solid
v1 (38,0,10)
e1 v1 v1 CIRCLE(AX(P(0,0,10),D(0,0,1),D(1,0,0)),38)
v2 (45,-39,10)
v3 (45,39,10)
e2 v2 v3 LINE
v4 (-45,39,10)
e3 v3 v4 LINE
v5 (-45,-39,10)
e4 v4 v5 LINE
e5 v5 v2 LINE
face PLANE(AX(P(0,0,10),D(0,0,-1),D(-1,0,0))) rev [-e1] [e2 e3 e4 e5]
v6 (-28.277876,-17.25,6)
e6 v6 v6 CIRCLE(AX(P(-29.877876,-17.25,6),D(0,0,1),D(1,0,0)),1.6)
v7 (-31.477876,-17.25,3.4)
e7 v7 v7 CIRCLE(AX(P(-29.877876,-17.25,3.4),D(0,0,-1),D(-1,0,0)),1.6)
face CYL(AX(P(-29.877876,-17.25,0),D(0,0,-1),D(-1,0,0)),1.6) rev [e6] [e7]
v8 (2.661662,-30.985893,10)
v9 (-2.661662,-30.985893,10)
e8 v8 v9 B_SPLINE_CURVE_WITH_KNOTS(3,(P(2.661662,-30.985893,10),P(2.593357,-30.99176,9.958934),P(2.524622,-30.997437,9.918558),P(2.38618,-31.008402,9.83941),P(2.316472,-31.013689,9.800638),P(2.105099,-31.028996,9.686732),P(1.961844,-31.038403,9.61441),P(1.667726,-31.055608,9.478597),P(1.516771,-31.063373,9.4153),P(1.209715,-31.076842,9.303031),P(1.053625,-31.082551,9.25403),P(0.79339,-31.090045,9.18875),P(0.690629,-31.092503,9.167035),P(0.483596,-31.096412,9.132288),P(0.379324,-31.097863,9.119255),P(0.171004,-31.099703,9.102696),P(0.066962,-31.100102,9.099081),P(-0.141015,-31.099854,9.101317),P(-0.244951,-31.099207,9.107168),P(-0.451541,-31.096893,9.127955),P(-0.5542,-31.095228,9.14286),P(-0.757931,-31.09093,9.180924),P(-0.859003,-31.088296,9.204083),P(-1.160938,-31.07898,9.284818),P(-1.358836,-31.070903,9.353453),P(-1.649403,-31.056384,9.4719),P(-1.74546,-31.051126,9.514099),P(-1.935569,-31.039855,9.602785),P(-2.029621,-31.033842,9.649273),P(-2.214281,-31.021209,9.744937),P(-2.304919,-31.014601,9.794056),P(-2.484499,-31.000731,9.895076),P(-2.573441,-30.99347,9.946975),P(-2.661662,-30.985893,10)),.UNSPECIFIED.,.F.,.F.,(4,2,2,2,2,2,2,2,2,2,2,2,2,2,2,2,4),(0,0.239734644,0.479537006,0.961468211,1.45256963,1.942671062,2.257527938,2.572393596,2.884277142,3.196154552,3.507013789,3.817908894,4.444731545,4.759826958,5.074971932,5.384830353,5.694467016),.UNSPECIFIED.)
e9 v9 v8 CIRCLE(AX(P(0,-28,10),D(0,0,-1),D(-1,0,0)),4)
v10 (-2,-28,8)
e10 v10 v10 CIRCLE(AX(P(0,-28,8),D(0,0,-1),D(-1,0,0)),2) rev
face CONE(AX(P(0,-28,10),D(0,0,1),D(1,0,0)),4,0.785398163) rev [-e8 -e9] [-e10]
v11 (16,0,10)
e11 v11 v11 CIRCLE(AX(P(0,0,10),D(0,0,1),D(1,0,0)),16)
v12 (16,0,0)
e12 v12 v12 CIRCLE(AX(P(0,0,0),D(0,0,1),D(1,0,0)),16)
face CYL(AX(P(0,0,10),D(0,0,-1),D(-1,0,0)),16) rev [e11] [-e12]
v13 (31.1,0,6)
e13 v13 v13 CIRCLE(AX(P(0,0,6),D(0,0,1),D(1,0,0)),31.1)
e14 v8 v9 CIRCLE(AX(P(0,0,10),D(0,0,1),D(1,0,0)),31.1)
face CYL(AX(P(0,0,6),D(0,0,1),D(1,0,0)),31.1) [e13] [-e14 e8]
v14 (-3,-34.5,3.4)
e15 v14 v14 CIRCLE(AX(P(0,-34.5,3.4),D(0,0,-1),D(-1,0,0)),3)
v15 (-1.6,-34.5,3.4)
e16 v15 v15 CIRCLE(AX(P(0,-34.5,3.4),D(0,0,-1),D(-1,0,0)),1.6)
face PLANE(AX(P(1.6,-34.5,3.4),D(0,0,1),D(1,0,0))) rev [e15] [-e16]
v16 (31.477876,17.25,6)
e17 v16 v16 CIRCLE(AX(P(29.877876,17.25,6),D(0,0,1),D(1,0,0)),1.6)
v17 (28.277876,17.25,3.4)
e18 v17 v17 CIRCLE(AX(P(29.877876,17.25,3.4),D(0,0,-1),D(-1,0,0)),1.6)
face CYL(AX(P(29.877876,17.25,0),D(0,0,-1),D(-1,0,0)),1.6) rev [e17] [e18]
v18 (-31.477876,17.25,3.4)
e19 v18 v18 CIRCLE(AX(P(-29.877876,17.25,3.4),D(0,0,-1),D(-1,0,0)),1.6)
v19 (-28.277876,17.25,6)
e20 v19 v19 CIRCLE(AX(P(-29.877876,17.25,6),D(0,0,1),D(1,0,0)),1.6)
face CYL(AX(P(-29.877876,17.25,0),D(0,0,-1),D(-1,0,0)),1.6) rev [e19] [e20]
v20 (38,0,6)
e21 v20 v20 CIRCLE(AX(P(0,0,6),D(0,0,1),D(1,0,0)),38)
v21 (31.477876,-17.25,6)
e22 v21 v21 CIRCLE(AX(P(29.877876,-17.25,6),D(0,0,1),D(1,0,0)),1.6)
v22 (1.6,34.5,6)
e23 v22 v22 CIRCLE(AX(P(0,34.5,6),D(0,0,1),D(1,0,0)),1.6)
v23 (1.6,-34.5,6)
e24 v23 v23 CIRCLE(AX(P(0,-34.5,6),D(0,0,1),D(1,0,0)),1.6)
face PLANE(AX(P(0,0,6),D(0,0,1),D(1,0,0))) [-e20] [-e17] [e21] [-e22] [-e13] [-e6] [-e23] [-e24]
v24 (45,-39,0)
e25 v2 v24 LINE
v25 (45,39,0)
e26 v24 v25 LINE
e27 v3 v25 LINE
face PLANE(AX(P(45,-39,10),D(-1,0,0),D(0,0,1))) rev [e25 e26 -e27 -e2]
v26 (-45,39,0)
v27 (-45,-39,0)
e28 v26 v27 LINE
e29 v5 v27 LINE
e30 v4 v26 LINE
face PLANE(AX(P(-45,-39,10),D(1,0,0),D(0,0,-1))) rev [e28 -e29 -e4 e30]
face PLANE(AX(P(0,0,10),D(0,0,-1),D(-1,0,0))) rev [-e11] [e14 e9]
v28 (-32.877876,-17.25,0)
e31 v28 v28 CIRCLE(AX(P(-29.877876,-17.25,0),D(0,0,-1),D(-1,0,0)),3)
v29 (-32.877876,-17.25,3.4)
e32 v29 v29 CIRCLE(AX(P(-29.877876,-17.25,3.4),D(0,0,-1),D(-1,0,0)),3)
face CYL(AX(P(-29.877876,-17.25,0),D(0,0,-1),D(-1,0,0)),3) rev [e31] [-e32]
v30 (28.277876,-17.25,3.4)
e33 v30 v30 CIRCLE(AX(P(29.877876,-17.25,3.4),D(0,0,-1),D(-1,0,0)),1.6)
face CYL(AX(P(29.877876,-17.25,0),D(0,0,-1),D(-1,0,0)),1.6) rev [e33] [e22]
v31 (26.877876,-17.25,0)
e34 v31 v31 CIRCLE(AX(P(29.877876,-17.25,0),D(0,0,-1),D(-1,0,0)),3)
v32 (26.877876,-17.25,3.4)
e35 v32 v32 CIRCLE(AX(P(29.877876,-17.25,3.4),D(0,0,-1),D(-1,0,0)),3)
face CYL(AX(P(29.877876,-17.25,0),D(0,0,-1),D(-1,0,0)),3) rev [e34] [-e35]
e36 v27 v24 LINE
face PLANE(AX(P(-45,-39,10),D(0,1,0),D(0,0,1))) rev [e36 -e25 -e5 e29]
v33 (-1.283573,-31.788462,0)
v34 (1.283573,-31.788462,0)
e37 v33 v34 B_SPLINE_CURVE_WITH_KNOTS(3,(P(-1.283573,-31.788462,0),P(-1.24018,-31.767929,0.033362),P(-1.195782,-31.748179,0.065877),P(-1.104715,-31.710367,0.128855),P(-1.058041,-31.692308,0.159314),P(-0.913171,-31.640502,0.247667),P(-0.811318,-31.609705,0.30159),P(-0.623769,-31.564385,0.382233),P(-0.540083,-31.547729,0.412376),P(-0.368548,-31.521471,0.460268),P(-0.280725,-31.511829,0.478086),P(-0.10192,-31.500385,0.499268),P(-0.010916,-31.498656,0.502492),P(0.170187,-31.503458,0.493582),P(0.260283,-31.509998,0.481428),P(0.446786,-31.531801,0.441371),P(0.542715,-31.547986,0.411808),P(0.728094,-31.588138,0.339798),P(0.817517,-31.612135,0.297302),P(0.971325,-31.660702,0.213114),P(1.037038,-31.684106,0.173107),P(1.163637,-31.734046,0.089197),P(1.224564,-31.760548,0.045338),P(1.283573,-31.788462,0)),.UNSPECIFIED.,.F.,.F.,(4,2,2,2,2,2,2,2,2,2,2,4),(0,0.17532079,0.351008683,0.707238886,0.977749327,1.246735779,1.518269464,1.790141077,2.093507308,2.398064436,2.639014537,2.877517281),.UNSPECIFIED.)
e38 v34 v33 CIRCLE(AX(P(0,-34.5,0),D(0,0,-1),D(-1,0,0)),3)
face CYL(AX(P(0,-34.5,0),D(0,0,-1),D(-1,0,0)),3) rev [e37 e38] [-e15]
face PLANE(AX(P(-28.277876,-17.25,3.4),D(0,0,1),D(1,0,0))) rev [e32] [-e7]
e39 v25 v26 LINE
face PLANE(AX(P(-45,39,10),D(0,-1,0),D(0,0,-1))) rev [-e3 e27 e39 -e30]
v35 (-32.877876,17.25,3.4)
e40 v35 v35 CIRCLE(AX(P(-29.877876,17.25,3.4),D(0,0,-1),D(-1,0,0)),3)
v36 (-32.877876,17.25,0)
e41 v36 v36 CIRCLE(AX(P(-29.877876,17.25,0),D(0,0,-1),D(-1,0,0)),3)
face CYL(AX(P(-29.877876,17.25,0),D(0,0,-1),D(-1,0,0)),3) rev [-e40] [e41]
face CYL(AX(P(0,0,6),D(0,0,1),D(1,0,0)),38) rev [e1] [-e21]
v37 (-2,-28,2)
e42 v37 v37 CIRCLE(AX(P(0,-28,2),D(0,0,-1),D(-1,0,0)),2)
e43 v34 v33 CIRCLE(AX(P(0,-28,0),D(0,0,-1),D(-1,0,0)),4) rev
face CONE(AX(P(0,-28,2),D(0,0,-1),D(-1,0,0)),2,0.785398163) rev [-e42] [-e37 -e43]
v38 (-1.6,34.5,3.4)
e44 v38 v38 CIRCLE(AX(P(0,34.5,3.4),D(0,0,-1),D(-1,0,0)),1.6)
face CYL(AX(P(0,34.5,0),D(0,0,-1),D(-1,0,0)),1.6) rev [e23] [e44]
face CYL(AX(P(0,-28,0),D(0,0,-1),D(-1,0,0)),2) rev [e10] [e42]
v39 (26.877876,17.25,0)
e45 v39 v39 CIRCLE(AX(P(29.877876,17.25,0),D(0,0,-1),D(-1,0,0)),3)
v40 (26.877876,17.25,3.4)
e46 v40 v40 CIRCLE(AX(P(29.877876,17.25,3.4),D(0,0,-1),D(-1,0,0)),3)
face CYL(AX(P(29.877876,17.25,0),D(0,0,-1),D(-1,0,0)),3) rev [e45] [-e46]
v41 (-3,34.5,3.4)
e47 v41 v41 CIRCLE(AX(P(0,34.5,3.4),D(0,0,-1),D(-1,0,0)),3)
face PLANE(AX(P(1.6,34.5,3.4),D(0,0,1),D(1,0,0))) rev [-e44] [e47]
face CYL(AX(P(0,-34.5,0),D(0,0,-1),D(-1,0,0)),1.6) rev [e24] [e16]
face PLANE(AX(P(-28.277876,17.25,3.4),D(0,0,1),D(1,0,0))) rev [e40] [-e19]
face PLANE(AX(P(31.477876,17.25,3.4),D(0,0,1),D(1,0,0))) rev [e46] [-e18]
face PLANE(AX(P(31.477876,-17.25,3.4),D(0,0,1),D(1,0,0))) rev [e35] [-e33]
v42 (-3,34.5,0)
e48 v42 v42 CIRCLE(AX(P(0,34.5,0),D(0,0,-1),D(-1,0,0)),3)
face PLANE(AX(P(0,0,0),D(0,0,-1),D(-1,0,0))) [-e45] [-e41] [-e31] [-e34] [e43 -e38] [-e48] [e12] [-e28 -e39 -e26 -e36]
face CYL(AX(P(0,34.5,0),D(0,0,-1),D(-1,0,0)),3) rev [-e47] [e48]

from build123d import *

# Parameters (mm, degrees)
SKETCH_1_W                = 90
SKETCH_1_H                = 78
SKETCH_1_R                = 16
EXTRUDE_1_DEPTH           = 10
SKETCH_2_R                = 38
SKETCH_2_R_2              = 31.1
CUT_EXTRUDE_1_DEPTH       = 4
HOLE_WIZARD_1_D           = 3.2
HOLE_WIZARD_1_DEPTH       = 8.5
HOLE_WIZARD_1_CBORE_D     = 6
HOLE_WIZARD_1_CBORE_DEPTH = 3.4
HOLE_WIZARD_1_TIP         = 0.96137699
HOLE_WIZARD_4_0_4_1_D     = 4
CHAMFER_1_SIZE            = 2


with BuildPart() as part:
    # 草图1 → 凸台-拉伸1 (new body)
    with BuildSketch(Plane.XY):
        Rectangle(SKETCH_1_W, SKETCH_1_H)
        Circle(SKETCH_1_R, mode=Mode.SUBTRACT)
    extrude(amount=EXTRUDE_1_DEPTH)

    # 草图2 → 切除-拉伸1 (cut)
    with BuildSketch(Plane.XY.offset(10)):
        Circle(SKETCH_2_R)
        Circle(SKETCH_2_R_2, mode=Mode.SUBTRACT)
    extrude(amount=-CUT_EXTRUDE_1_DEPTH, mode=Mode.SUBTRACT)

    # 打孔尺寸(%根据)内六角圆柱头螺钉的类型1
    with Locations(Plane(origin=(0, 0, 0), x_dir=(-1, 0, 0), z_dir=(0, 0, -1))):
        with Locations((0, 34.5), (29.877876431, 17.25), (29.877876431, -17.25), (0, -34.5), (-29.877876431, -17.25), (-29.877876431, 17.25)):
            CounterBoreHole(HOLE_WIZARD_1_D / 2, HOLE_WIZARD_1_CBORE_D / 2, HOLE_WIZARD_1_CBORE_DEPTH, depth=HOLE_WIZARD_1_DEPTH)
            with Locations((0, 0, -(HOLE_WIZARD_1_DEPTH + HOLE_WIZARD_1_TIP / 2))):  # 118° drill point
                Cone(0, HOLE_WIZARD_1_D / 2, HOLE_WIZARD_1_TIP, mode=Mode.SUBTRACT)

    # Ø4.0 (4) 直径孔1 (through all)
    with Locations(Plane(origin=(0, 0, 0), x_dir=(-1, 0, 0), z_dir=(0, 0, -1))):
        with Locations((0, -28)):
            Hole(HOLE_WIZARD_4_0_4_1_D / 2)

    # 倒角1
    # the kernel refuses this chamfer: 2 mm, written as the material it takes off along each edge
    with BuildSketch(Plane(origin=(0, -28, 0), x_dir=(1, 0, 0), z_dir=(0, -1, 0))) as chamfer_1_piece_1:
        Polygon((2 + CHAMFER_1_SIZE, 0), (2, CHAMFER_1_SIZE), (2, 0), align=None)
    revolve(axis=Axis((0, -28, 0), (0, 0, 1)), mode=Mode.SUBTRACT)
    with BuildSketch(Plane(origin=(0, -28, 10), x_dir=(1, 0, 0), z_dir=(0, -1, 0))) as chamfer_1_piece_2:
        Polygon((2, -CHAMFER_1_SIZE), (2 + CHAMFER_1_SIZE, 0), (2, 0), align=None)
    revolve(axis=Axis((0, -28, 10), (0, 0, 1)), mode=Mode.SUBTRACT)


solid = part.part
